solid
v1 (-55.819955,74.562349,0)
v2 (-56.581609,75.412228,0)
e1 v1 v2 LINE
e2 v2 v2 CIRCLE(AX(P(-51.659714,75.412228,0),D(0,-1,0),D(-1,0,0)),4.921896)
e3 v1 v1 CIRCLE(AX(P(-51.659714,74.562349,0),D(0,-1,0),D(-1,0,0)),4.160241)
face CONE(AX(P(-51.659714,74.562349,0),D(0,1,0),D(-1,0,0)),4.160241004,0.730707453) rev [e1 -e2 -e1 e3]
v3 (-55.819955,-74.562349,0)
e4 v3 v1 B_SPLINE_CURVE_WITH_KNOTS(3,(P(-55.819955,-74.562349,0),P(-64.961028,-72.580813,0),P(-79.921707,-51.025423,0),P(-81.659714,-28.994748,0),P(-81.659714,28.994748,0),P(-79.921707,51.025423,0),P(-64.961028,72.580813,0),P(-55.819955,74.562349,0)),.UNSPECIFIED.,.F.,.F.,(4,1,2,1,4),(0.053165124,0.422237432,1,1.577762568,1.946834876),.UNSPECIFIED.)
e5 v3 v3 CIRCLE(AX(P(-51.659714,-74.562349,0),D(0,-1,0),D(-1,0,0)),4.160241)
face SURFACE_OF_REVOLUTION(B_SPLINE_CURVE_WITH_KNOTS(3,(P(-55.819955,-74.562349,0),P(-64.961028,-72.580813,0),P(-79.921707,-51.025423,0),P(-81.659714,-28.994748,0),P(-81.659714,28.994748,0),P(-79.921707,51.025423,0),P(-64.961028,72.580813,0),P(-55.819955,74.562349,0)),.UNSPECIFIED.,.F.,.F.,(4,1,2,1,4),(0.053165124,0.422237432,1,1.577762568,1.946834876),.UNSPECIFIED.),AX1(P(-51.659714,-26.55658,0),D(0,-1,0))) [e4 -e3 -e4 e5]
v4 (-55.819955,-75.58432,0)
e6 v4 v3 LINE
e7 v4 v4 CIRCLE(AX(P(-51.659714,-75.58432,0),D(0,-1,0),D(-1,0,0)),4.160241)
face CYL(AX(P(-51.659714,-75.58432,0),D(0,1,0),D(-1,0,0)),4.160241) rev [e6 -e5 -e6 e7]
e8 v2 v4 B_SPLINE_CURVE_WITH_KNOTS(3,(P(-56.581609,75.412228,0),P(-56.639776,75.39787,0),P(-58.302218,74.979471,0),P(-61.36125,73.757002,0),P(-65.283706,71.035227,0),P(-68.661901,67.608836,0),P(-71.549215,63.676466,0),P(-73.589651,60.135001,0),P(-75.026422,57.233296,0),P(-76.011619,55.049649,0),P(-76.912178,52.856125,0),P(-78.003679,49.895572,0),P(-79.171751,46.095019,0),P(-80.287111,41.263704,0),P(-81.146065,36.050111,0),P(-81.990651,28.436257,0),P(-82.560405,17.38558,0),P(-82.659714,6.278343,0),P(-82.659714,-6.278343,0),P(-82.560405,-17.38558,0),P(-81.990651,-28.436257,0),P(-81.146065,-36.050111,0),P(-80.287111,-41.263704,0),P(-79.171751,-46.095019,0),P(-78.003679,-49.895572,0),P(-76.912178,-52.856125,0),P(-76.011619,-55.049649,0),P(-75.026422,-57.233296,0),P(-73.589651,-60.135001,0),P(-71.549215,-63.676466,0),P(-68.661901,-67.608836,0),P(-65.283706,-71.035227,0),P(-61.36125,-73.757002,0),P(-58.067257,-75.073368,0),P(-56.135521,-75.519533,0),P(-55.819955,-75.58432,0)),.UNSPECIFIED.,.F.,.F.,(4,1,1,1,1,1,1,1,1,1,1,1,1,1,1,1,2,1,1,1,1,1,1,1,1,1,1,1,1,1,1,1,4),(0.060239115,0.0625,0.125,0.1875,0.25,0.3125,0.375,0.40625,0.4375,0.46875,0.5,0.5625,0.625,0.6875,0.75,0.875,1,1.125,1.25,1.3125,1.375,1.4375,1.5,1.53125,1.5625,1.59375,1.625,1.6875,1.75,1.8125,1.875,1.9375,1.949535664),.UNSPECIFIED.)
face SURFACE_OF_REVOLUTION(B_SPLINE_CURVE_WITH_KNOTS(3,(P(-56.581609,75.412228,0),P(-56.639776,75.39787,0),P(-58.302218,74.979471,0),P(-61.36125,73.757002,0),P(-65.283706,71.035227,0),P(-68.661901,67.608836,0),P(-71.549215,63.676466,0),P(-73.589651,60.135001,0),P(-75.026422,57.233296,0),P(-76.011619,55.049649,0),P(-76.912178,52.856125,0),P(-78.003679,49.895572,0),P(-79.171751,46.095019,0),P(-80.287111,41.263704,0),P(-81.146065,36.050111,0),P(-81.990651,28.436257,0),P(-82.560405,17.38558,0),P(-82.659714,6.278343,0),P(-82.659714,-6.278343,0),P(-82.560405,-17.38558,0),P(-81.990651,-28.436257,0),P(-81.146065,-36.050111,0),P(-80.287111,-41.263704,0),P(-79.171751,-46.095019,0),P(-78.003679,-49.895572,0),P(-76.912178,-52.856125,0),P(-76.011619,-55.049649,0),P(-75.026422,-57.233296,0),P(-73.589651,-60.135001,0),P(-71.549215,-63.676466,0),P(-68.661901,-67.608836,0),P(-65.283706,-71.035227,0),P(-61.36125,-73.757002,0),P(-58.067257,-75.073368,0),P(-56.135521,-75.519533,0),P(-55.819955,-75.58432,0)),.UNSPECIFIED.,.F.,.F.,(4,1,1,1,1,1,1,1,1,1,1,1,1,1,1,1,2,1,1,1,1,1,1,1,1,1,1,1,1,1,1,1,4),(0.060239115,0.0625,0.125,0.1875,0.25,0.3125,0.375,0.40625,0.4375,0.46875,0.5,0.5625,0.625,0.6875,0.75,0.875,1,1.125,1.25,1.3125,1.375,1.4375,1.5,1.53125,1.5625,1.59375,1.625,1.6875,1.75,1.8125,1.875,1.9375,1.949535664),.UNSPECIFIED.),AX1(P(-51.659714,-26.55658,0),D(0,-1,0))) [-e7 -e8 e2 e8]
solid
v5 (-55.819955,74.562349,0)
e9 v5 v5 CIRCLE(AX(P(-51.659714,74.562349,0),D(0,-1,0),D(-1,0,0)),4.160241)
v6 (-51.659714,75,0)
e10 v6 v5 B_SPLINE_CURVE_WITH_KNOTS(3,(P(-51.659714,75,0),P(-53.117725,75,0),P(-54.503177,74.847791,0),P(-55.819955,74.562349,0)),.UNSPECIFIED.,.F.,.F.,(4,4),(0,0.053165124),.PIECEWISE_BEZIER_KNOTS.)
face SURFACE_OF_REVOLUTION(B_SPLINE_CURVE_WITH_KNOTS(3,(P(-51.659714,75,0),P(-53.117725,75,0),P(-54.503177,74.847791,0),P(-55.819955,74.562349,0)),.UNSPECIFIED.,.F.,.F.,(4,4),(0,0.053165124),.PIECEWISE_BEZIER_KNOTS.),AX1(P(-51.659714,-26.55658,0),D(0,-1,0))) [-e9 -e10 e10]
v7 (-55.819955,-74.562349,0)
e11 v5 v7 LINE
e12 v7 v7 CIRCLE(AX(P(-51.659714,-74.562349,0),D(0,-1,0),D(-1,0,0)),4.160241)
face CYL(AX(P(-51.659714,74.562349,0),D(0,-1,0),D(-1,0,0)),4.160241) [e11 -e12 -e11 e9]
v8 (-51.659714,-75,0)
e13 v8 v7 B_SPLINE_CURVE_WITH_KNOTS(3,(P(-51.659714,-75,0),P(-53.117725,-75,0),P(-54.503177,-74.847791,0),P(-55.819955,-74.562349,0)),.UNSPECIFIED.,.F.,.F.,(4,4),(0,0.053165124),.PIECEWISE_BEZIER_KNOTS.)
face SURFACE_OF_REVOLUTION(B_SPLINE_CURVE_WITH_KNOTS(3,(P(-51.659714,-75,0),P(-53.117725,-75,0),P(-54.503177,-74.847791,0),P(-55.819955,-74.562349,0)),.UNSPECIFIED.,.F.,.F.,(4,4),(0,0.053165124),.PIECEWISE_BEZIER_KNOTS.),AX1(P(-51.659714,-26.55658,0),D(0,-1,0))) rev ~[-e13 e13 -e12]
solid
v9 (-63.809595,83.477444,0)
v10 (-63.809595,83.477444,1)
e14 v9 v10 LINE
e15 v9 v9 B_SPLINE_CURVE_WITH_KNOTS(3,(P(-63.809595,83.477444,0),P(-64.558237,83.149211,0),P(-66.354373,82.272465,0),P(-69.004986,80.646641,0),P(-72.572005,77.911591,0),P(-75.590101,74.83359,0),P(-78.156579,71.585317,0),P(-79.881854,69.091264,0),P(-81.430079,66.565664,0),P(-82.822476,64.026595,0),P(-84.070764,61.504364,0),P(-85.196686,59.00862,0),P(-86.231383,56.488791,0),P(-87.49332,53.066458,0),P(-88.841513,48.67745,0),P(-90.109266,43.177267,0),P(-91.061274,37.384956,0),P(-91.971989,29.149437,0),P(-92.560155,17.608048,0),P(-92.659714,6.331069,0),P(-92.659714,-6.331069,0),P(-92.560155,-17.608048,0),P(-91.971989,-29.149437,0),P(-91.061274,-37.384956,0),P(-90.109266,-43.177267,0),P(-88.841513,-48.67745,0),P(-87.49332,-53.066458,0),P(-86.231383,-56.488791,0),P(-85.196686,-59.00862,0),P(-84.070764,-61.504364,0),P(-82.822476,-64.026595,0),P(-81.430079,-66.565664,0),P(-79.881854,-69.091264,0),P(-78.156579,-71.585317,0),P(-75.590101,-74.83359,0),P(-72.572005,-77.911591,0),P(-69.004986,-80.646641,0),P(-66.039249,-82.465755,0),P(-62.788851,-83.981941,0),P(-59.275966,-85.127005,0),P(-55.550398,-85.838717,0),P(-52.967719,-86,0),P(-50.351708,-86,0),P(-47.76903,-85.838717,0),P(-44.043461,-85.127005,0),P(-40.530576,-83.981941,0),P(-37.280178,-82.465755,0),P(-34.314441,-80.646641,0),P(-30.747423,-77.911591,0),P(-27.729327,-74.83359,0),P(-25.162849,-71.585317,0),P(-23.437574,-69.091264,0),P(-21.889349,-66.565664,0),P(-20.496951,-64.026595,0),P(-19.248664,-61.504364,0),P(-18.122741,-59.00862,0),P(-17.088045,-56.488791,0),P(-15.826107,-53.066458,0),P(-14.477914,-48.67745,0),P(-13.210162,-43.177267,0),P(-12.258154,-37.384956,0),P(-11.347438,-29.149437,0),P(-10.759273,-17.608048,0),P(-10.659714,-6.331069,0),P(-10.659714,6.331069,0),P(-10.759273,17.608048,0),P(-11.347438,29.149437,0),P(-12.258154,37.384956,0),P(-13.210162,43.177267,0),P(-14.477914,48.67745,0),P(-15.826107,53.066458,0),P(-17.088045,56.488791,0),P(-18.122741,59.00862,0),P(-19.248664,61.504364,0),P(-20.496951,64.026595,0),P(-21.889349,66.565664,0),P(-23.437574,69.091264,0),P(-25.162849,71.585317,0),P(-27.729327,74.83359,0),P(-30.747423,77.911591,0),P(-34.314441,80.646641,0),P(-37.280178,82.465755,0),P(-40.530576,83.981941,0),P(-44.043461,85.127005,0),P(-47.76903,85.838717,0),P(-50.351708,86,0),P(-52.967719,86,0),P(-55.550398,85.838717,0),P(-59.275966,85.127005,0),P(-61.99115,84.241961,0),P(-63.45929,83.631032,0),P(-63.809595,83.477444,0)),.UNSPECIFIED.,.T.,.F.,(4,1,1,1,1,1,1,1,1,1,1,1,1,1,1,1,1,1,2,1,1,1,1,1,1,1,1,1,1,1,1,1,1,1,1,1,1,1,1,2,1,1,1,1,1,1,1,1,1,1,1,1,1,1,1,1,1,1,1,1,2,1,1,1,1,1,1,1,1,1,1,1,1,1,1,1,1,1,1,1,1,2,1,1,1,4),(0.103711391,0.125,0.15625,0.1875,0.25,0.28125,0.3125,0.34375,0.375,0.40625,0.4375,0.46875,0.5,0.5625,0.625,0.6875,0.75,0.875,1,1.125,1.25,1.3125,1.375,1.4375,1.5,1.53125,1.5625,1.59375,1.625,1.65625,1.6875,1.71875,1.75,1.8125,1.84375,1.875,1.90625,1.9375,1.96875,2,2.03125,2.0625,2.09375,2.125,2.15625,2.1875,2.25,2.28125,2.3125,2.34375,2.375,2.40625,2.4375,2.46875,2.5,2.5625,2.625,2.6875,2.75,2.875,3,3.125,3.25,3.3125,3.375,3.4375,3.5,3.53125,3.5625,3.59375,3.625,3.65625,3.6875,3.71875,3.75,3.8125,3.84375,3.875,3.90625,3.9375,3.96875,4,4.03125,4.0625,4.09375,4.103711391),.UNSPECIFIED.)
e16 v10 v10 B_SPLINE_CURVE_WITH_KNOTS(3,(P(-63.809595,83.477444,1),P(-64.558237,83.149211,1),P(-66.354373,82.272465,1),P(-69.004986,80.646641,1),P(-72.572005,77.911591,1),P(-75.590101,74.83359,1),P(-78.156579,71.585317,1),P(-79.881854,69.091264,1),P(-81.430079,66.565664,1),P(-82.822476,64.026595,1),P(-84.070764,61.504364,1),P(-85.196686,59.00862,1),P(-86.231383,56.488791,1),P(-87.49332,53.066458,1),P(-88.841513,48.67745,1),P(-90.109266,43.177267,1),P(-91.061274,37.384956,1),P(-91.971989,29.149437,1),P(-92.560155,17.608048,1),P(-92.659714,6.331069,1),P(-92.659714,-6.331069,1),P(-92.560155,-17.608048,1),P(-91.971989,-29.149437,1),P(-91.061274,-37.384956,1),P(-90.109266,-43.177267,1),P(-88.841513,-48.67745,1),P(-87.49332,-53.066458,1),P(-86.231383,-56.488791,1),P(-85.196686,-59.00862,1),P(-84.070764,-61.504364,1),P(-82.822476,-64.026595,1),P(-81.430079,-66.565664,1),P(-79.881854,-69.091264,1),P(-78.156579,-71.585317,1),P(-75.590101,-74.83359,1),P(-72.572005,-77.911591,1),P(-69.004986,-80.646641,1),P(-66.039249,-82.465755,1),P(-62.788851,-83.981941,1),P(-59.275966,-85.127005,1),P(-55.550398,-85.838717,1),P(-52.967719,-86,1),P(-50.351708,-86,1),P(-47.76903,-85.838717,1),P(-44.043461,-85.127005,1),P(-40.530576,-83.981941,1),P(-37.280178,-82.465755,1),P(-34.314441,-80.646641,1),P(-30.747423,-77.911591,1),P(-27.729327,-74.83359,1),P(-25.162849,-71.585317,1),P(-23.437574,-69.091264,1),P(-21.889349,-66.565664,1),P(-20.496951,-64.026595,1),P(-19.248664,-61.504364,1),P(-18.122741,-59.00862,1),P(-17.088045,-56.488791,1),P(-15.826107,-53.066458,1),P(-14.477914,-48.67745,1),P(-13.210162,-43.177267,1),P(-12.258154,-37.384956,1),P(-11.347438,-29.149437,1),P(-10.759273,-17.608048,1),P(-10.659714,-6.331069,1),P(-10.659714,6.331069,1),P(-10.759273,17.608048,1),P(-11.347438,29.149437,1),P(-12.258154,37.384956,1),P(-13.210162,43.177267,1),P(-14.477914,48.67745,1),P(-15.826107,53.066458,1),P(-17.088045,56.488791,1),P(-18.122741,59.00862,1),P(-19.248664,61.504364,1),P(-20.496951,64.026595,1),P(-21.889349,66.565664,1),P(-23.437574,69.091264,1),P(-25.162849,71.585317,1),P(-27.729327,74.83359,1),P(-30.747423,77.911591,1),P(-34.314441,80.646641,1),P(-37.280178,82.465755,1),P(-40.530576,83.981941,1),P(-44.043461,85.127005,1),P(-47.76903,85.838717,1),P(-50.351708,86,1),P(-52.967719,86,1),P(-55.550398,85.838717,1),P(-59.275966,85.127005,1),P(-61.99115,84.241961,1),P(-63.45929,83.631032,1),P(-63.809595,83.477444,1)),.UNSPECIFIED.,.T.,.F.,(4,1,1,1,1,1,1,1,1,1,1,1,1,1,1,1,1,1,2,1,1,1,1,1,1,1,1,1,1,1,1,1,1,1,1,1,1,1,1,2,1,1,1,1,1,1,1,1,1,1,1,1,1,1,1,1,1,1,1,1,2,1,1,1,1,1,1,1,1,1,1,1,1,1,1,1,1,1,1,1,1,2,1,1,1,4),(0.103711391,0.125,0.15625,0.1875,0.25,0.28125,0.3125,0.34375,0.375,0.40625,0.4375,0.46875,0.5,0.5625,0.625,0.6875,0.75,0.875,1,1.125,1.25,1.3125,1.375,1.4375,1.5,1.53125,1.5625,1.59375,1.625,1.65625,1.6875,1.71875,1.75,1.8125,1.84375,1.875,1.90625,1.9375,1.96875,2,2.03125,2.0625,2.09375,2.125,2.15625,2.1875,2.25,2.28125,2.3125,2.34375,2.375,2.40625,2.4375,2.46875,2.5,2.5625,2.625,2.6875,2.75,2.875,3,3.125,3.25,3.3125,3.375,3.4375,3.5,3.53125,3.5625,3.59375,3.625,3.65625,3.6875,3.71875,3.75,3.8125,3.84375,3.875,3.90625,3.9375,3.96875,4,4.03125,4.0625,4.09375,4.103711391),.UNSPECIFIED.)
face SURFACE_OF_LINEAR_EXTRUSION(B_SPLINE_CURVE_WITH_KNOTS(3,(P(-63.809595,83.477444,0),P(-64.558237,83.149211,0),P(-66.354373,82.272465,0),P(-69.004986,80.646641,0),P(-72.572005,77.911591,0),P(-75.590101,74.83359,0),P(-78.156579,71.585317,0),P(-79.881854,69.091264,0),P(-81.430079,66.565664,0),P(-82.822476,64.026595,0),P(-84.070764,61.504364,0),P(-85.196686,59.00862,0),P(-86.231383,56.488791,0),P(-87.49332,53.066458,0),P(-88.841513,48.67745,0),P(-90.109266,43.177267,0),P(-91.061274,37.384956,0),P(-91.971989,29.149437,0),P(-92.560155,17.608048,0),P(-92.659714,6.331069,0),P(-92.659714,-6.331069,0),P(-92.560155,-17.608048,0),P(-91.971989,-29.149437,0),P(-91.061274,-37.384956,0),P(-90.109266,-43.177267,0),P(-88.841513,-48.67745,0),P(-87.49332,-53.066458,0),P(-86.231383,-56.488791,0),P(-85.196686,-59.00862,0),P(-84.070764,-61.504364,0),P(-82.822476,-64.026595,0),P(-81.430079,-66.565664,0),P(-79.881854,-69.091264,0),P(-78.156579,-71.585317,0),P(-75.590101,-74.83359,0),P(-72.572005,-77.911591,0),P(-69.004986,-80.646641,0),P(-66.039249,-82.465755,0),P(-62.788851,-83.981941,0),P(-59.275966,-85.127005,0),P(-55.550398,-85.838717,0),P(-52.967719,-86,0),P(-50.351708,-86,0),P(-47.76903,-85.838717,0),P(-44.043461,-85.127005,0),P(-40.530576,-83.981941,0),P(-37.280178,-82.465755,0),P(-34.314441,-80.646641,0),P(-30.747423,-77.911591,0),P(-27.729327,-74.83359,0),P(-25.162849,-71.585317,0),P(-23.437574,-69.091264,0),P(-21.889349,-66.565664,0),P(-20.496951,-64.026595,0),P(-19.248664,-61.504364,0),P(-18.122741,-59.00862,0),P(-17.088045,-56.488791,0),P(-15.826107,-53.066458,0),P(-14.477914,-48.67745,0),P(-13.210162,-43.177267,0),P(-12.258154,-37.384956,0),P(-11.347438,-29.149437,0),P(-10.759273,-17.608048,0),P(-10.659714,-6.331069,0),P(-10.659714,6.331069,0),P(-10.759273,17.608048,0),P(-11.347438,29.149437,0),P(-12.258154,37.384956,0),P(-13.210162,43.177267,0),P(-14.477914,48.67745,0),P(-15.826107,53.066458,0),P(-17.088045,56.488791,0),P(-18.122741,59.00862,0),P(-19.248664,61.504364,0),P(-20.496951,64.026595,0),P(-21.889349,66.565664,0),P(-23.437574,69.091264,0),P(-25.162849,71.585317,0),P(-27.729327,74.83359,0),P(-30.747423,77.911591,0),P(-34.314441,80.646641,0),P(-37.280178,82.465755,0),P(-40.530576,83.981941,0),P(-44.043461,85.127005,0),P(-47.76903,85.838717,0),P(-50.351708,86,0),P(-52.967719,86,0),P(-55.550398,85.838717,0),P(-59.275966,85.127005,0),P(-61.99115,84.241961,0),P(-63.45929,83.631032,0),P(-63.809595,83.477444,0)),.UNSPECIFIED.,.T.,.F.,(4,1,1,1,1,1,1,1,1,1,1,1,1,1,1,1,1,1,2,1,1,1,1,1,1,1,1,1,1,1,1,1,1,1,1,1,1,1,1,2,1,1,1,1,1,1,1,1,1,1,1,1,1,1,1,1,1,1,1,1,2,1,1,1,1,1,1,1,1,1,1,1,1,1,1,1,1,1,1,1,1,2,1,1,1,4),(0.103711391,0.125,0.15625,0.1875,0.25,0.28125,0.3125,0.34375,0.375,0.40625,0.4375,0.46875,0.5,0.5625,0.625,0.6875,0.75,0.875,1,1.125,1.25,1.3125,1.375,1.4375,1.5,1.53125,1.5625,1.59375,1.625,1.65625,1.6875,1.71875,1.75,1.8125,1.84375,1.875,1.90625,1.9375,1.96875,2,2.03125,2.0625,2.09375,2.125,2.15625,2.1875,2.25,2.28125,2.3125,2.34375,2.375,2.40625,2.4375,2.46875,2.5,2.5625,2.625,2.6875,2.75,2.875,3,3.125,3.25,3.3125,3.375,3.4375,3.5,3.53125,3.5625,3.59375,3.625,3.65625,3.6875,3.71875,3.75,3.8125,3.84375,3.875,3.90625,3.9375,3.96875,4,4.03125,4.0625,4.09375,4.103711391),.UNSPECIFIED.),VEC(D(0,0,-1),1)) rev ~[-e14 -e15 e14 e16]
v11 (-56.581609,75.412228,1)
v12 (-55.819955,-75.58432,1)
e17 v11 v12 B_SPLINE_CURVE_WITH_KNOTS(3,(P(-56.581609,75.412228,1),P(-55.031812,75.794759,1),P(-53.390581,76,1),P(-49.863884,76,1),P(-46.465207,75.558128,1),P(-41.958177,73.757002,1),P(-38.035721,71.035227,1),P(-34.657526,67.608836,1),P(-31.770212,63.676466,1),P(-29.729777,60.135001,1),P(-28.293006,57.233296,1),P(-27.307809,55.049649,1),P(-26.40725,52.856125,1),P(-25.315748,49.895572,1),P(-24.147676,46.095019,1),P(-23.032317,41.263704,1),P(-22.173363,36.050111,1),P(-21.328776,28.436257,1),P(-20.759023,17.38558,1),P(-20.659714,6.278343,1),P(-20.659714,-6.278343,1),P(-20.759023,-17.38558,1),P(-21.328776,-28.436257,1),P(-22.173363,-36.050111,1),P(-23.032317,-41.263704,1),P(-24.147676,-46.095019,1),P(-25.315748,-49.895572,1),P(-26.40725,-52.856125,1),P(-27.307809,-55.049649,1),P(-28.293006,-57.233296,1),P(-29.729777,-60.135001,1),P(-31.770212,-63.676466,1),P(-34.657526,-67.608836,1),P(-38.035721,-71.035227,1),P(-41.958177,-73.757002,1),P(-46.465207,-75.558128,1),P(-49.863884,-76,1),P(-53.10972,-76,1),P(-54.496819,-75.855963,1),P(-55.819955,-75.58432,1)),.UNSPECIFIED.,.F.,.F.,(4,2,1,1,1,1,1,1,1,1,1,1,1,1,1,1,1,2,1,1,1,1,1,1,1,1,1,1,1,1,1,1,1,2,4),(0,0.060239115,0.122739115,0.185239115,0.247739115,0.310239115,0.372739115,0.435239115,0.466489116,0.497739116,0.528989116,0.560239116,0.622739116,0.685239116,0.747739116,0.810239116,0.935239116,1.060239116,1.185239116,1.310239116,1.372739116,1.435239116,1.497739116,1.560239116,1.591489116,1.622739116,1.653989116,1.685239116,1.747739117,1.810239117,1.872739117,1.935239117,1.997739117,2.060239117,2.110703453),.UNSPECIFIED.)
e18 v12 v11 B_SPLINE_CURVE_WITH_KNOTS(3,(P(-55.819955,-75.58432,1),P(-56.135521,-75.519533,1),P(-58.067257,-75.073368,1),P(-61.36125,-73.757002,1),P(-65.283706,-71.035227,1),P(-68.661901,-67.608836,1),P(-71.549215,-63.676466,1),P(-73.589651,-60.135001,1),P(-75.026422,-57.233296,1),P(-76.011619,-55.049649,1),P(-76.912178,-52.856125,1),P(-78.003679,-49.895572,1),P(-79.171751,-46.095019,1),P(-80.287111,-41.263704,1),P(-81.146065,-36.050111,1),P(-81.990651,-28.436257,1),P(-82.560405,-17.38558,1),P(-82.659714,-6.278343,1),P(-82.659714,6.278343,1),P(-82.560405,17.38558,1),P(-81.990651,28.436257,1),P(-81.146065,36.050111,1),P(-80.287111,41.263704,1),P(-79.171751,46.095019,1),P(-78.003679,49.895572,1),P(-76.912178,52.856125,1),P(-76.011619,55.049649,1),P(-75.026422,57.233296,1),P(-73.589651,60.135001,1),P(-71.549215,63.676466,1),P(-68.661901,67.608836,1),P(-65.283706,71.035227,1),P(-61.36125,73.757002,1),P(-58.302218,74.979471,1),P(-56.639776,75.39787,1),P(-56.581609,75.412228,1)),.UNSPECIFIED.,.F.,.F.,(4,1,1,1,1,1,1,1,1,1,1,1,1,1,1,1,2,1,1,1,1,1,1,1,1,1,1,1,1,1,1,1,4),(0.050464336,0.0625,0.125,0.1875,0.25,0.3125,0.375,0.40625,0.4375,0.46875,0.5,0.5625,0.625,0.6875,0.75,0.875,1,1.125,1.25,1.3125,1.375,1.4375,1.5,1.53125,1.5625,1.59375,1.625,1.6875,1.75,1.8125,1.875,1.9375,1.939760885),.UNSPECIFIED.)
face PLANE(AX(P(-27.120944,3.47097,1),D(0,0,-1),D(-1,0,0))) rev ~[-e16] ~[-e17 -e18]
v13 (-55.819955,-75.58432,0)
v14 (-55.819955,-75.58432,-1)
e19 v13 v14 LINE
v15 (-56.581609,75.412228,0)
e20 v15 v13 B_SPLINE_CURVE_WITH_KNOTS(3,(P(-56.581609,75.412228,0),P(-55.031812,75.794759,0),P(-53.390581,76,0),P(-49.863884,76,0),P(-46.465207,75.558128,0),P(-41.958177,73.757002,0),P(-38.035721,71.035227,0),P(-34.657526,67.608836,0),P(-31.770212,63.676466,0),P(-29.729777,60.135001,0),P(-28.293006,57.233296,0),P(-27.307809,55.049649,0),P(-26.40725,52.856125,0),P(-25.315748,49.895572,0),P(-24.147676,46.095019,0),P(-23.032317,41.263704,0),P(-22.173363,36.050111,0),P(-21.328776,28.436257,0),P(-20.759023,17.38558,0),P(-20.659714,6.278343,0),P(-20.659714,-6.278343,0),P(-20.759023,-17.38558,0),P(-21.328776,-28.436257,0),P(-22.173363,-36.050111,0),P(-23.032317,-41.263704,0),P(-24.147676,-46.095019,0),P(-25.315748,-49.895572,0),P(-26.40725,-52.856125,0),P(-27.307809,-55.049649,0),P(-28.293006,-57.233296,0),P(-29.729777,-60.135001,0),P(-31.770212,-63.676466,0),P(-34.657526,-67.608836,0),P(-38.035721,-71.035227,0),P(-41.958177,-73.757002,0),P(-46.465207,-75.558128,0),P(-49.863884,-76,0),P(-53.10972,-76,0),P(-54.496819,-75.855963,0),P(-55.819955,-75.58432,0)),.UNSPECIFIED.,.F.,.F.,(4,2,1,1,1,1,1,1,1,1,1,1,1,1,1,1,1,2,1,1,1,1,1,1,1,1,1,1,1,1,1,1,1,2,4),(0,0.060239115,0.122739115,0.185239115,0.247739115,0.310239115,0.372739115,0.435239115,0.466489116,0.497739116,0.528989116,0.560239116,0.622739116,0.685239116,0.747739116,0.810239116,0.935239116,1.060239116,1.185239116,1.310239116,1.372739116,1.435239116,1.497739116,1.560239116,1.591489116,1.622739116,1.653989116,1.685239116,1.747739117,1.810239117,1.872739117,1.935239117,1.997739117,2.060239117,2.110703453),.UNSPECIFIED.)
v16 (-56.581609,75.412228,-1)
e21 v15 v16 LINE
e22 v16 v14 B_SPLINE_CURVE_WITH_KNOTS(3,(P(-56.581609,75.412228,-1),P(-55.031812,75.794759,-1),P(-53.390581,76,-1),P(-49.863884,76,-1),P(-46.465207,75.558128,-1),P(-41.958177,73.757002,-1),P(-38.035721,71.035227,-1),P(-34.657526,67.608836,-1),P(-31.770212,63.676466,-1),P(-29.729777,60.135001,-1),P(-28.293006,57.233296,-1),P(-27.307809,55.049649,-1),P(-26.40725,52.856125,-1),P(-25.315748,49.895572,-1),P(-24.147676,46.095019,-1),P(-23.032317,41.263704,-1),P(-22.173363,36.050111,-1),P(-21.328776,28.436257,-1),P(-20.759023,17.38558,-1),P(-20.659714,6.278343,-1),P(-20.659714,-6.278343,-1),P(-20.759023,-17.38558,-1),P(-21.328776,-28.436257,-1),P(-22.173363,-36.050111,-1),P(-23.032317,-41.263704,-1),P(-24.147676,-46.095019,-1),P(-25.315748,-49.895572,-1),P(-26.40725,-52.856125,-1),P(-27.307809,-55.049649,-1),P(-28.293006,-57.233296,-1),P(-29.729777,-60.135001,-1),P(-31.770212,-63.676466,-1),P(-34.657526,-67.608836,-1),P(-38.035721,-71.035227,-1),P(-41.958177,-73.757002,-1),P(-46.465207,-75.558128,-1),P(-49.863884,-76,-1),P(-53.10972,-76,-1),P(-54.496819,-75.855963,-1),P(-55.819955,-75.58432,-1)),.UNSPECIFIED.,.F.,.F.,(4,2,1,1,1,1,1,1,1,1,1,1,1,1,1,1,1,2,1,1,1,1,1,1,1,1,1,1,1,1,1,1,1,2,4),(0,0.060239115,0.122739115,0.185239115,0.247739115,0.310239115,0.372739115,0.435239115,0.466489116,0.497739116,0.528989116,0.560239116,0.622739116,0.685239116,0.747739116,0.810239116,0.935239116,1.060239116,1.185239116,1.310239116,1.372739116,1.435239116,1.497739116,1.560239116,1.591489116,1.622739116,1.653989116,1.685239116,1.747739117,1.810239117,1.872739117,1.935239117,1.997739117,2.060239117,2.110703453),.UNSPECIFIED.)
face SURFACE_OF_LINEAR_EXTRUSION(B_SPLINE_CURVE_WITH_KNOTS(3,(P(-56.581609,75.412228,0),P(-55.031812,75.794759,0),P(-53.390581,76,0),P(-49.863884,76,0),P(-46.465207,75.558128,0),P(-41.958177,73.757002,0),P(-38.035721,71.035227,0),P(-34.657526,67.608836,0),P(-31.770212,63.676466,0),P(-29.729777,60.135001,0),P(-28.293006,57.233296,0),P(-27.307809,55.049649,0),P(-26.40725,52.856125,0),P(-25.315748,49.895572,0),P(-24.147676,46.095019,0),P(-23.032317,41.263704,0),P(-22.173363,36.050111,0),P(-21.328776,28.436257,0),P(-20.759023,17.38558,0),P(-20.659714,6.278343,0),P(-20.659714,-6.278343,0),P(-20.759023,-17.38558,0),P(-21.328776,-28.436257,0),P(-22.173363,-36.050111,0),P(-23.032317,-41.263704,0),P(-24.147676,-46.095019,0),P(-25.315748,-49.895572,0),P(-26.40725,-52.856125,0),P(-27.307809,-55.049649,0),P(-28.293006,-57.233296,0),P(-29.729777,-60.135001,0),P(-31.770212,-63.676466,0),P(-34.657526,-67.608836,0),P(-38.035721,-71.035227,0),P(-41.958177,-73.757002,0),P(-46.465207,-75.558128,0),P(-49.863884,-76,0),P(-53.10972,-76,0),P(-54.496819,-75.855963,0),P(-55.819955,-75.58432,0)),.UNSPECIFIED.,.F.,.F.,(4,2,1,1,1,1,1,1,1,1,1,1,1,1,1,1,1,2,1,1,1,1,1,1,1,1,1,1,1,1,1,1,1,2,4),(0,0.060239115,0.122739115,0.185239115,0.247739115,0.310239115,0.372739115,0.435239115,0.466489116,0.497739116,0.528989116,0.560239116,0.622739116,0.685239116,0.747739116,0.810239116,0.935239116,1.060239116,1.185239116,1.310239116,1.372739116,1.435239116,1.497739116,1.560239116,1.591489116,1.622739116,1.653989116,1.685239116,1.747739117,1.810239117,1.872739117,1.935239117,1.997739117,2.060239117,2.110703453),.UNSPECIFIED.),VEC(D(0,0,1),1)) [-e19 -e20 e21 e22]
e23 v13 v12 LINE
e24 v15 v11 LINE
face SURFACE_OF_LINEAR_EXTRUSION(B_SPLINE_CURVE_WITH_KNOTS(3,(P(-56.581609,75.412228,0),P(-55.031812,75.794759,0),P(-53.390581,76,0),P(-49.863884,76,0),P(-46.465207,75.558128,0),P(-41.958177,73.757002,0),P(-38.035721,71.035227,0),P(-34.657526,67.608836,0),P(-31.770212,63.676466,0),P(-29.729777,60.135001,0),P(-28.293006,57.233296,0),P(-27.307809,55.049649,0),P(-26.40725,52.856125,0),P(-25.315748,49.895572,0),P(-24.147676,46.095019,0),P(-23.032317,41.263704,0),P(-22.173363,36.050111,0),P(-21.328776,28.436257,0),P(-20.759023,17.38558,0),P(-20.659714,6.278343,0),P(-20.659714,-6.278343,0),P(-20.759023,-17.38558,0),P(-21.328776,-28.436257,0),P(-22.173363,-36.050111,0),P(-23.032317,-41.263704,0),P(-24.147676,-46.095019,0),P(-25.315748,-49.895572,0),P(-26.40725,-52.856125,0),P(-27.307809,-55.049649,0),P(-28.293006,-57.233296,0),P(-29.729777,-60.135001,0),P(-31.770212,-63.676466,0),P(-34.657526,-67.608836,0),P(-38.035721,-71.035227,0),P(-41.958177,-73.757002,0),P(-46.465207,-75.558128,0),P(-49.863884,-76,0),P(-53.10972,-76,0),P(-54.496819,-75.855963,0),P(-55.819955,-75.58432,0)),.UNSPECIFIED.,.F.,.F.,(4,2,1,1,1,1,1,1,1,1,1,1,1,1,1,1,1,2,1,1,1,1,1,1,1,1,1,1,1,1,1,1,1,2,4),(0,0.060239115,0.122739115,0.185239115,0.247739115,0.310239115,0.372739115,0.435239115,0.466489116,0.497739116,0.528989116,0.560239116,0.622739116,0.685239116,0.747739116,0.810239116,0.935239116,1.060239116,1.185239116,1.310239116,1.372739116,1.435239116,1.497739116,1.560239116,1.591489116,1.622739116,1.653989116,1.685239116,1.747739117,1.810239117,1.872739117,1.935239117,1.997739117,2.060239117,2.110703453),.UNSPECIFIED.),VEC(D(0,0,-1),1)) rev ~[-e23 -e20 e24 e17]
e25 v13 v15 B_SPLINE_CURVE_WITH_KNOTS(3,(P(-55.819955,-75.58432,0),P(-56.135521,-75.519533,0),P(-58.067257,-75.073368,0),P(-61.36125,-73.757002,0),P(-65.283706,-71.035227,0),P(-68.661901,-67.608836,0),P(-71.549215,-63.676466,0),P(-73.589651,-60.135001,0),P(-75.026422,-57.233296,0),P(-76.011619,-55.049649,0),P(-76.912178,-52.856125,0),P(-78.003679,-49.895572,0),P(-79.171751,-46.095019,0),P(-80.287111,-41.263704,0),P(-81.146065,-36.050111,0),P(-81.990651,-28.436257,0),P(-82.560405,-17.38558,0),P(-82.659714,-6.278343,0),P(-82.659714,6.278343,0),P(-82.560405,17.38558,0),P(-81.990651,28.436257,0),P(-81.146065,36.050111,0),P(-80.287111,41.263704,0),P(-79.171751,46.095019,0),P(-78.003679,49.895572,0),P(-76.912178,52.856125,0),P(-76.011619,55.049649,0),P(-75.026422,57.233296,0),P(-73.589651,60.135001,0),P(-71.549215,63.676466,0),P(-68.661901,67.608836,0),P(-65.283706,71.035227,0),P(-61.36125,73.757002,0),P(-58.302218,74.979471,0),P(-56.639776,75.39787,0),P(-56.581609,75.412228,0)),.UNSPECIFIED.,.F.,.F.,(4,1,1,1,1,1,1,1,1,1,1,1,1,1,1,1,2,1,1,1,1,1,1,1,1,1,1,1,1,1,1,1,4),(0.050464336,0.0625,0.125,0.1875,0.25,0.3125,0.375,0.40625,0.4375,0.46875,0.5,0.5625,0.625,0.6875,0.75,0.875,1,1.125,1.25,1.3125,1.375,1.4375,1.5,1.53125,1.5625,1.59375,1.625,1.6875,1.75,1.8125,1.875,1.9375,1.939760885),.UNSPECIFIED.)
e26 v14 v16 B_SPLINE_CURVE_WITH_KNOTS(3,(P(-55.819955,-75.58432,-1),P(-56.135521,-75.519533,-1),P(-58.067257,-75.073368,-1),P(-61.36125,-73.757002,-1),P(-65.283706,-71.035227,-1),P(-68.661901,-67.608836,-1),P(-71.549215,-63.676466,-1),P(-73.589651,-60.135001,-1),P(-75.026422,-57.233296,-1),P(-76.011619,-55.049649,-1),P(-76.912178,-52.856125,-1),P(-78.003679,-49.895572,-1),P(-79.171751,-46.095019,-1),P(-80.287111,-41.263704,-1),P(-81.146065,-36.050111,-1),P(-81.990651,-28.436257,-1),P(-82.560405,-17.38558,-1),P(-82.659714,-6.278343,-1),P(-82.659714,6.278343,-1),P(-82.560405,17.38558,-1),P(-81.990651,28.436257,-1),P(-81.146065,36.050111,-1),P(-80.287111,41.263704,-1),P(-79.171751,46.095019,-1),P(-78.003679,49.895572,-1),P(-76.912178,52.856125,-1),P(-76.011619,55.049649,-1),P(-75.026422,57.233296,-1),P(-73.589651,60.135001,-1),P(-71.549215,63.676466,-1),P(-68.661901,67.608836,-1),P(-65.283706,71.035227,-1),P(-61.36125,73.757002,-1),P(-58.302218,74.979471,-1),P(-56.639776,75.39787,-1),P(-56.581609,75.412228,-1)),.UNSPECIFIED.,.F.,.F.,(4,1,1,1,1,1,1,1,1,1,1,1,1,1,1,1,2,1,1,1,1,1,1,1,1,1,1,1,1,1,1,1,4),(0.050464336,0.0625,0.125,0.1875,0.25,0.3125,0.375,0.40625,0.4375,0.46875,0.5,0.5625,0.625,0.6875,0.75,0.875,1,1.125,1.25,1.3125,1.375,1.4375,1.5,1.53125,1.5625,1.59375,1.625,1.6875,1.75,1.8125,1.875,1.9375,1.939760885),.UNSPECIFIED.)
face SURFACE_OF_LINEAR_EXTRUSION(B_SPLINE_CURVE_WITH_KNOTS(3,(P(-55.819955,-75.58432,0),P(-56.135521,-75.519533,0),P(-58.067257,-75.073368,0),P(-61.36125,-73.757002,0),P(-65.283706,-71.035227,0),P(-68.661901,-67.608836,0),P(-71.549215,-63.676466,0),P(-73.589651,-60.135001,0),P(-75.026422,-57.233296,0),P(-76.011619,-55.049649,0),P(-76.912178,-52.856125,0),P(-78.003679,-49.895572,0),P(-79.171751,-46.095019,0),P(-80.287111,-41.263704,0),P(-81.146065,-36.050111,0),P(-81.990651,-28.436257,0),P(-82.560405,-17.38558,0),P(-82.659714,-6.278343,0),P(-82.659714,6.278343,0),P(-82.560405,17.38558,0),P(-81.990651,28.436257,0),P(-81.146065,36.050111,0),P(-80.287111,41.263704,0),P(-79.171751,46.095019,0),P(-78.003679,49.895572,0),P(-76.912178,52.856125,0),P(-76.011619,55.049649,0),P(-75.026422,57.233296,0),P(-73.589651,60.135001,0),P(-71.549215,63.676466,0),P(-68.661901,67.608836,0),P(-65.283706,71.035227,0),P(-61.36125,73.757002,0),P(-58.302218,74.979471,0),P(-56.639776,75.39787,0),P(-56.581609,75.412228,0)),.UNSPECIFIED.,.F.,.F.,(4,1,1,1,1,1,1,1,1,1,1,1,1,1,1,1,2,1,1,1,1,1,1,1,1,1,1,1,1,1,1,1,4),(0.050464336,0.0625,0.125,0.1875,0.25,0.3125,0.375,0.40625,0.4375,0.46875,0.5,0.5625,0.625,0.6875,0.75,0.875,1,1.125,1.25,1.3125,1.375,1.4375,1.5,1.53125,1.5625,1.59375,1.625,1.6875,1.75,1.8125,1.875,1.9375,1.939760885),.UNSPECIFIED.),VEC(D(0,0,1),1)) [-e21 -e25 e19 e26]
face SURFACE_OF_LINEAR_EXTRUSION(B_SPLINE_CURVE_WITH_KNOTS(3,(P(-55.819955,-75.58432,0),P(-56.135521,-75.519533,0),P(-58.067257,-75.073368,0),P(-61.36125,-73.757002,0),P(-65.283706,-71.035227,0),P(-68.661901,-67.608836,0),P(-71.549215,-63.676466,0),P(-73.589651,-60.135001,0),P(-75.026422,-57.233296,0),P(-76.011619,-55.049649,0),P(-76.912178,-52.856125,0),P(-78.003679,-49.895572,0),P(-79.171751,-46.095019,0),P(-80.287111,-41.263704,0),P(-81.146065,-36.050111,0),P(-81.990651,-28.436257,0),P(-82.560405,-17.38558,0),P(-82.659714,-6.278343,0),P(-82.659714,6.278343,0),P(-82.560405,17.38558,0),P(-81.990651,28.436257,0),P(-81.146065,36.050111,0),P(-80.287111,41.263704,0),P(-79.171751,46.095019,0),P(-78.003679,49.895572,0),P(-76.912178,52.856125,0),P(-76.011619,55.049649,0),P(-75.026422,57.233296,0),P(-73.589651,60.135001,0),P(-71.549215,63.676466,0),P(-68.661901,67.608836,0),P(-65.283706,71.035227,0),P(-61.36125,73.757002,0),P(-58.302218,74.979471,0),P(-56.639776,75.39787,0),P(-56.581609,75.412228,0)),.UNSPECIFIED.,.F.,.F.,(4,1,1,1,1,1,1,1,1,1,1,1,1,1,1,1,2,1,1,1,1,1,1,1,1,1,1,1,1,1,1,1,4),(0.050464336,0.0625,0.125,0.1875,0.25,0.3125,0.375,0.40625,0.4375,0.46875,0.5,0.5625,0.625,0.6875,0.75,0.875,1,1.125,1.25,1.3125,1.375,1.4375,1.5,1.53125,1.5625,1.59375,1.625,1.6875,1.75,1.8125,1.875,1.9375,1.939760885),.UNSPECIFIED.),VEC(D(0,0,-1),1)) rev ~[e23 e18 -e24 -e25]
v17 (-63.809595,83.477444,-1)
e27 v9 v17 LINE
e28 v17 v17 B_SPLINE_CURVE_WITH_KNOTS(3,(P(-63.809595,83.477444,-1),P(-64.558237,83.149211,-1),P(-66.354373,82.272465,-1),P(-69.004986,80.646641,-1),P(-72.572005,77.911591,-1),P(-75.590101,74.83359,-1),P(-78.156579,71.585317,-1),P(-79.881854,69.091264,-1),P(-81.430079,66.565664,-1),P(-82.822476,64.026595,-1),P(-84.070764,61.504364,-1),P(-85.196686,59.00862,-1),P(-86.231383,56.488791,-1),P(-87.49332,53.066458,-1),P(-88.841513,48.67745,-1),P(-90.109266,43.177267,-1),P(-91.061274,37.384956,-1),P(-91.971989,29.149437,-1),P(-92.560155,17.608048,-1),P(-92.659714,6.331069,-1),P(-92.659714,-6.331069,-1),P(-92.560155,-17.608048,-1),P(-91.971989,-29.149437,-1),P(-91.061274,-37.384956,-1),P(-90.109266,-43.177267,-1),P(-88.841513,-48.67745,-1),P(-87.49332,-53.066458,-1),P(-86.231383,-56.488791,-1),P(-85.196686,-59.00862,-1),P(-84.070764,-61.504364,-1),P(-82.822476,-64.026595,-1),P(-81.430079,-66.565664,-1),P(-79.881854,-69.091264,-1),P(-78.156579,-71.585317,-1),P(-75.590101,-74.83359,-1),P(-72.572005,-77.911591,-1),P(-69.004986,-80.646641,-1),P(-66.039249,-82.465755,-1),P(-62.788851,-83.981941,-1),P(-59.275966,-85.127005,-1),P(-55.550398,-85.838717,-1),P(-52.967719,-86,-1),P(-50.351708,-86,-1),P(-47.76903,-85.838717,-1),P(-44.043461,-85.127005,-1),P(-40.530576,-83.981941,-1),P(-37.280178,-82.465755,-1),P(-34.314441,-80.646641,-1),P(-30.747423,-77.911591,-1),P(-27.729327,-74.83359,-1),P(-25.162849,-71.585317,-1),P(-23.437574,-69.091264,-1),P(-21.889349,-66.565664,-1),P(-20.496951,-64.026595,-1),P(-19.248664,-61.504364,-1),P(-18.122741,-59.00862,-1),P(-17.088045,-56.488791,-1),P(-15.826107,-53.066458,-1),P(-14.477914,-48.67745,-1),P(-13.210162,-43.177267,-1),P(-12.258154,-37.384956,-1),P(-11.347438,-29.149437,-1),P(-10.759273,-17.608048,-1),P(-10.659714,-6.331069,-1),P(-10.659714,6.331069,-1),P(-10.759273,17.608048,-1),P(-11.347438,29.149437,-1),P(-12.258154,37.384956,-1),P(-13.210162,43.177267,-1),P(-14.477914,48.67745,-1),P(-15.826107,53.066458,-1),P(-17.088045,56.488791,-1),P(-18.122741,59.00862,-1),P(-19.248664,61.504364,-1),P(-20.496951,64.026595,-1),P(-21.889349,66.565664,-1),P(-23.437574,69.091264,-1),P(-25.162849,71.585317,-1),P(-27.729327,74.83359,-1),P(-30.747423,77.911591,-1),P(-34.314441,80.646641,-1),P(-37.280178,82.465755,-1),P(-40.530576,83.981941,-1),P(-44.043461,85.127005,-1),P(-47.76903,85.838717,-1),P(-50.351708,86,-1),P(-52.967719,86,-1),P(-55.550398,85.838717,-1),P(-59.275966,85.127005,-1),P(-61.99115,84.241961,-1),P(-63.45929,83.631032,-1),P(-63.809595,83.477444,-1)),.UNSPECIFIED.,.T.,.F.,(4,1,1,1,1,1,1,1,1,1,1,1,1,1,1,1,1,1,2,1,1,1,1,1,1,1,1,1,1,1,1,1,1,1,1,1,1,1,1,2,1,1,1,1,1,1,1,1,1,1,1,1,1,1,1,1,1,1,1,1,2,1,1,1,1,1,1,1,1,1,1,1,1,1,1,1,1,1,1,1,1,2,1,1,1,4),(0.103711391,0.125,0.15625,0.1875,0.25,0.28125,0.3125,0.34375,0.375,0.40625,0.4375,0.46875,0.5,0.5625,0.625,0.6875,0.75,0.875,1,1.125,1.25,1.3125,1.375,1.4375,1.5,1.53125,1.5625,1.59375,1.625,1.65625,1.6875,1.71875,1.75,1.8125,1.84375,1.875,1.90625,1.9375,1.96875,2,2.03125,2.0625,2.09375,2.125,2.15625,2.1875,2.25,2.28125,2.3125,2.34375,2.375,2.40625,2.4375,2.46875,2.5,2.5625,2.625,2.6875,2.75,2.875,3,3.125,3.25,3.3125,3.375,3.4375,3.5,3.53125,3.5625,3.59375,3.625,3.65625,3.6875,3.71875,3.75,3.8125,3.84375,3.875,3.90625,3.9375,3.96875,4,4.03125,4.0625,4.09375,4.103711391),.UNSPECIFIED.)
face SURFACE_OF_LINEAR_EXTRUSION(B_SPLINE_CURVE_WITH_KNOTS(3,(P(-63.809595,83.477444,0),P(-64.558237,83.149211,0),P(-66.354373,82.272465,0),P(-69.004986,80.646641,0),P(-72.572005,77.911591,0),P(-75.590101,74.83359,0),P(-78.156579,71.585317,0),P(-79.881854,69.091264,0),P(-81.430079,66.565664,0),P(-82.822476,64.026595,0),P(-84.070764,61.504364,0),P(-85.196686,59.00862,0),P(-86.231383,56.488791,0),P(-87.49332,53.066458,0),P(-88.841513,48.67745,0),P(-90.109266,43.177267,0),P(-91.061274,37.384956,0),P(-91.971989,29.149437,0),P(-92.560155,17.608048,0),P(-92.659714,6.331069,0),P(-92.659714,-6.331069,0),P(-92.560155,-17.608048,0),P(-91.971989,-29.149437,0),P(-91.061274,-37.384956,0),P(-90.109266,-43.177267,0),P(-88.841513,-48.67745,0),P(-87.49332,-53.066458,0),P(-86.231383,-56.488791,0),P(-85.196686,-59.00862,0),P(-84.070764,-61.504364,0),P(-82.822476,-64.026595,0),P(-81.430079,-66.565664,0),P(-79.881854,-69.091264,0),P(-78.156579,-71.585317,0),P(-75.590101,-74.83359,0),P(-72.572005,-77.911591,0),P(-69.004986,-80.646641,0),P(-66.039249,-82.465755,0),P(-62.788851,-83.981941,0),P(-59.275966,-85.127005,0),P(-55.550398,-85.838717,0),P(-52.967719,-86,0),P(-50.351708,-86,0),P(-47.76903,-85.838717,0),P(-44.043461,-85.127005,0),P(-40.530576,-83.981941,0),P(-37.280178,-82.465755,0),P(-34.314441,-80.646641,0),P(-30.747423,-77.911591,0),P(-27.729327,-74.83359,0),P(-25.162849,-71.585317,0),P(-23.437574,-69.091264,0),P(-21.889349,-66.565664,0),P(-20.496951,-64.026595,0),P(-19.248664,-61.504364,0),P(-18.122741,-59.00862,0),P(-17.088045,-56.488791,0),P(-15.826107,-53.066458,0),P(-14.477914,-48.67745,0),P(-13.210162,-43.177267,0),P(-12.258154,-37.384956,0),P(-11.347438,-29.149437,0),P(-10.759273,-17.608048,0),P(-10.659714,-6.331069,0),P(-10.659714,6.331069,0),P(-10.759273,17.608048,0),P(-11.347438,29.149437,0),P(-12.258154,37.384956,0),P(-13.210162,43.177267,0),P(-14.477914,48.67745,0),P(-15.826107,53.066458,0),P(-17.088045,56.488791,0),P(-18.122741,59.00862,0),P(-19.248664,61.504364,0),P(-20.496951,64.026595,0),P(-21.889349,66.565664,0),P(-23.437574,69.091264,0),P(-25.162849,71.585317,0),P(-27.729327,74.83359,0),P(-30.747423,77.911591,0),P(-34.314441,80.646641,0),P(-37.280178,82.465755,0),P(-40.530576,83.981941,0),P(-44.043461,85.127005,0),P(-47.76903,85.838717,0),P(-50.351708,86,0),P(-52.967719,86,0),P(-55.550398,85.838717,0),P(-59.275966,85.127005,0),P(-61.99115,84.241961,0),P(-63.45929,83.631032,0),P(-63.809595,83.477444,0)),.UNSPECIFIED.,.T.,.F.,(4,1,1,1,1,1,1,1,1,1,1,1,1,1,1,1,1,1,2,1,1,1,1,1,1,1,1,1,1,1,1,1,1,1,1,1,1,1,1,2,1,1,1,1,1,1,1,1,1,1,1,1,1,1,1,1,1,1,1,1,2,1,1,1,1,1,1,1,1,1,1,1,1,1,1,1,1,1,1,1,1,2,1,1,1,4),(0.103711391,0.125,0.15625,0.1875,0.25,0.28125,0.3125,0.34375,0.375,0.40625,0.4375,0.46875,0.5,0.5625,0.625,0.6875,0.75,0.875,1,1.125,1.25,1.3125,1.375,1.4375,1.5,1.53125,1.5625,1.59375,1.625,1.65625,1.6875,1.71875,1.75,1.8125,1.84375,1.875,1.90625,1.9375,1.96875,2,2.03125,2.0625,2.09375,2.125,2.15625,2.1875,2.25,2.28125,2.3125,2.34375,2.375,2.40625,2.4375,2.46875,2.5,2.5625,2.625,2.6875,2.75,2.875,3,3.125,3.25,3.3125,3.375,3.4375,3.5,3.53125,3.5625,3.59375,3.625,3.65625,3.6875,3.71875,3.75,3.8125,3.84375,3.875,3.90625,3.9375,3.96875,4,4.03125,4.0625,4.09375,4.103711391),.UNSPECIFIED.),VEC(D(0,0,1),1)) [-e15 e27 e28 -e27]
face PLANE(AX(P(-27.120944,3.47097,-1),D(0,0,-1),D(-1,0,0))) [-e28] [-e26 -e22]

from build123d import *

# Parameters (mm, degrees)
F2_DEPTH = 1


# Not quite as in the source:
# - the dataset's text gives a spline's control points without its knots; the knots are read off the source's solid


with BuildPart() as f1:
    # F0 (on Top) → F1 (revolve)
    with BuildSketch(Plane.XY):
        with BuildLine():
            Line((-55.8199547231, 74.5623492029), (-56.5816092533, 75.4122275922))
            add(Edge.make_bspline(
                [(-56.5816092533, 75.4122275922), (-56.6397760093, 75.3978704726), (-58.3022178812, 74.9794709714), (-61.3612502345, 73.7570023616), (-65.2837059846, 71.035227187), (-68.6619012674, 67.6088358251), (-71.5492149944, 63.676466045), (-73.5896506783, 60.135000823), (-75.0264216479, 57.2332962118), (-76.0116188685, 55.0496489597), (-76.912177867, 52.8561250408), (-78.003679448, 49.8955719617), (-79.1717511063, 46.0950193349), (-80.2871106611, 41.2637042949), (-81.1460647488, 36.0501110723), (-81.9906513276, 28.4362571667), (-82.5604048188, 17.3855802508), (-82.6597137195, 6.2783429019), (-82.6597137195, 0)],
                knots=[0.0602391152, 0.0602391152, 0.0602391152, 0.0602391152, 0.0625, 0.125, 0.1875, 0.25, 0.3125, 0.375, 0.40625, 0.4375, 0.46875, 0.5, 0.5625, 0.625, 0.6875, 0.75, 0.875, 1, 1, 1, 1], degree=3))
            add(Edge.make_bspline(
                [(-55.8199547231, -75.5843198027), (-56.1355205763, -75.5195334393), (-58.0672567218, -75.0733675402), (-61.3612502345, -73.7570023616), (-65.2837059846, -71.035227187), (-68.6619012674, -67.6088358251), (-71.5492149944, -63.676466045), (-73.5896506783, -60.135000823), (-75.0264216479, -57.2332962118), (-76.0116188685, -55.0496489597), (-76.912177867, -52.8561250408), (-78.003679448, -49.8955719617), (-79.1717511063, -46.0950193349), (-80.2871106611, -41.2637042949), (-81.1460647488, -36.0501110723), (-81.9906513276, -28.4362571667), (-82.5604048188, -17.3855802508), (-82.6597137195, -6.2783429019), (-82.6597137195, 0)],
                knots=[0.0504643362, 0.0504643362, 0.0504643362, 0.0504643362, 0.0625, 0.125, 0.1875, 0.25, 0.3125, 0.375, 0.40625, 0.4375, 0.46875, 0.5, 0.5625, 0.625, 0.6875, 0.75, 0.875, 1, 1, 1, 1], degree=3))
            Line((-55.8199547231, -75.5843198027), (-55.8199547231, -74.5623492029))
            add(Edge.make_bspline(
                [(-55.8199547231, -74.5623492029), (-64.9610278539, -72.5808125911), (-79.9217070161, -51.0254234957), (-81.6597137195, -28.9947475074), (-81.6597137195, 0)],
                knots=[0.0531651237, 0.0531651237, 0.0531651237, 0.0531651237, 0.4222374323, 1, 1, 1, 1], degree=3))
            add(Edge.make_bspline(
                [(-55.8199547231, 74.5623492029), (-64.9610278539, 72.5808125911), (-79.9217070161, 51.0254234957), (-81.6597137195, 28.9947475074), (-81.6597137195, 0)],
                knots=[0.0531651237, 0.0531651237, 0.0531651237, 0.0531651237, 0.4222374323, 1, 1, 1, 1], degree=3))
        make_face()
    revolve(axis=Axis((-51.6597137195, -26.5565803749, 0), (0, -1, 0)))


with BuildPart() as f1b:
    # F0 (on Top) → F1, piece 2 (revolve)
    with BuildSketch(Plane.XY):
        with BuildLine():
            Line((-51.6597137195, -75), (-51.6597137195, 75))
            add(Edge.make_bspline(
                [(-51.6597137195, 75), (-53.117725446, 75), (-54.5031767561, 74.8477909354), (-55.8199547231, 74.5623492029)],
                knots=[0, 0, 0, 0, 0.0531651237, 0.0531651237, 0.0531651237, 0.0531651237], degree=3))
            Line((-55.8199547231, 74.5623492029), (-55.8199547231, -74.5623492029))
            add(Edge.make_bspline(
                [(-51.6597137195, -75), (-53.117725446, -75), (-54.5031767561, -74.8477909354), (-55.8199547231, -74.5623492029)],
                knots=[0, 0, 0, 0, 0.0531651237, 0.0531651237, 0.0531651237, 0.0531651237], degree=3))
        make_face()
    revolve(axis=Axis((-51.6597137195, -26.5565803749, 0), (0, -1, 0)))


with BuildPart() as f2:
    # F0 (on Top) → F2 (new body, symmetric)
    with BuildSketch(Plane.XY):
        with BuildLine():
            add(Edge.make_bspline(
                [(-51.6597137195, 76), (-53.3905810534, 76), (-55.0318116526, 75.794759317), (-56.5816092533, 75.4122275922)],
                knots=[0, 0, 0, 0, 0.0602391152, 0.0602391152, 0.0602391152, 0.0602391152], degree=3))
            add(Edge.make_bspline(
                [(-51.6597137195, 76), (-49.8638837493, 76), (-46.4652067363, 75.5581281718), (-41.9581772046, 73.7570023616), (-38.0357214545, 71.035227187), (-34.6575261717, 67.6088358251), (-31.7702124447, 63.676466045), (-29.7297767607, 60.135000823), (-28.2930057912, 57.2332962118), (-27.3078085706, 55.0496489597), (-26.407249572, 52.8561250408), (-25.3157479911, 49.8955719617), (-24.1476763328, 46.0950193349), (-23.0323167779, 41.2637042949), (-22.1733626903, 36.0501110723), (-21.3287761115, 28.4362571667), (-20.7590226202, 17.3855802508), (-20.6597137195, 6.2783429019), (-20.6597137195, 0)],
                knots=[0, 0, 0, 0, 0.0625, 0.125, 0.1875, 0.25, 0.3125, 0.375, 0.40625, 0.4375, 0.46875, 0.5, 0.5625, 0.625, 0.6875, 0.75, 0.875, 1, 1, 1, 1], degree=3))
            add(Edge.make_bspline(
                [(-51.6597137195, -76), (-49.8638837493, -76), (-46.4652067363, -75.5581281718), (-41.9581772046, -73.7570023616), (-38.0357214545, -71.035227187), (-34.6575261717, -67.6088358251), (-31.7702124447, -63.676466045), (-29.7297767607, -60.135000823), (-28.2930057912, -57.2332962118), (-27.3078085706, -55.0496489597), (-26.407249572, -52.8561250408), (-25.3157479911, -49.8955719617), (-24.1476763328, -46.0950193349), (-23.0323167779, -41.2637042949), (-22.1733626903, -36.0501110723), (-21.3287761115, -28.4362571667), (-20.7590226202, -17.3855802508), (-20.6597137195, -6.2783429019), (-20.6597137195, 0)],
                knots=[0, 0, 0, 0, 0.0625, 0.125, 0.1875, 0.25, 0.3125, 0.375, 0.40625, 0.4375, 0.46875, 0.5, 0.5625, 0.625, 0.6875, 0.75, 0.875, 1, 1, 1, 1], degree=3))
            Line((-51.6597137195, -76), (-51.6597137195, -86))
            add(Edge.make_bspline(
                [(-51.6597137195, -86), (-50.3517081027, -86), (-47.7690296636, -85.8387170423), (-44.0434614492, -85.1270052189), (-40.5305762875, -83.9819411512), (-37.2801784464, -82.4657547396), (-34.314441056, -80.6466412752), (-30.747422832, -77.9115906547), (-27.7293267494, -74.8335900569), (-25.1628486092, -71.5853173338), (-23.4375735308, -69.0912636735), (-21.889348579, -66.5656635825), (-20.4969514445, -64.0265948028), (-19.2486638728, -61.504363593), (-18.1227411236, -59.0086196482), (-17.0880446352, -56.4887914009), (-15.8261069566, -53.0664581165), (-14.4779141554, -48.6774501047), (-13.2101618031, -43.1772674245), (-12.2581535204, -37.384955502), (-11.3474379426, -29.1494372612), (-10.7592725159, -17.6080481383), (-10.6597137195, -6.3310685453), (-10.6597137195, 0)],
                knots=[0, 0, 0, 0, 0.03125, 0.0625, 0.09375, 0.125, 0.15625, 0.1875, 0.25, 0.28125, 0.3125, 0.34375, 0.375, 0.40625, 0.4375, 0.46875, 0.5, 0.5625, 0.625, 0.6875, 0.75, 0.875, 1, 1, 1, 1], degree=3))
            add(Edge.make_bspline(
                [(-51.6597137195, 86), (-50.3517081027, 86), (-47.7690296636, 85.8387170423), (-44.0434614492, 85.1270052189), (-40.5305762875, 83.9819411512), (-37.2801784464, 82.4657547396), (-34.314441056, 80.6466412752), (-30.747422832, 77.9115906547), (-27.7293267494, 74.8335900569), (-25.1628486092, 71.5853173338), (-23.4375735308, 69.0912636735), (-21.889348579, 66.5656635825), (-20.4969514445, 64.0265948028), (-19.2486638728, 61.504363593), (-18.1227411236, 59.0086196482), (-17.0880446352, 56.4887914009), (-15.8261069566, 53.0664581165), (-14.4779141554, 48.6774501047), (-13.2101618031, 43.1772674245), (-12.2581535204, 37.384955502), (-11.3474379426, 29.1494372612), (-10.7592725159, 17.6080481383), (-10.6597137195, 6.3310685453), (-10.6597137195, 0)],
                knots=[0, 0, 0, 0, 0.03125, 0.0625, 0.09375, 0.125, 0.15625, 0.1875, 0.25, 0.28125, 0.3125, 0.34375, 0.375, 0.40625, 0.4375, 0.46875, 0.5, 0.5625, 0.625, 0.6875, 0.75, 0.875, 1, 1, 1, 1], degree=3))
            add(Edge.make_bspline(
                [(-51.6597137195, 86), (-52.9677193364, 86), (-55.5503977755, 85.8387170423), (-59.2759659899, 85.1270052189), (-61.9911504677, 84.2419605791), (-63.4592895327, 83.6310316869), (-63.8095950817, 83.4774444461)],
                knots=[0, 0, 0, 0, 0.03125, 0.0625, 0.09375, 0.1037113909, 0.1037113909, 0.1037113909, 0.1037113909], degree=3))
            Line((-63.8095950817, 83.4774444461), (-56.5816092533, 75.4122275922))
        make_face()
        with BuildLine():
            add(Edge.make_bspline(
                [(-56.5816092533, 75.4122275922), (-56.6397760093, 75.3978704726), (-58.3022178812, 74.9794709714), (-61.3612502345, 73.7570023616), (-65.2837059846, 71.035227187), (-68.6619012674, 67.6088358251), (-71.5492149944, 63.676466045), (-73.5896506783, 60.135000823), (-75.0264216479, 57.2332962118), (-76.0116188685, 55.0496489597), (-76.912177867, 52.8561250408), (-78.003679448, 49.8955719617), (-79.1717511063, 46.0950193349), (-80.2871106611, 41.2637042949), (-81.1460647488, 36.0501110723), (-81.9906513276, 28.4362571667), (-82.5604048188, 17.3855802508), (-82.6597137195, 6.2783429019), (-82.6597137195, 0)],
                knots=[0.0602391152, 0.0602391152, 0.0602391152, 0.0602391152, 0.0625, 0.125, 0.1875, 0.25, 0.3125, 0.375, 0.40625, 0.4375, 0.46875, 0.5, 0.5625, 0.625, 0.6875, 0.75, 0.875, 1, 1, 1, 1], degree=3))
            Line((-56.5816092533, 75.4122275922), (-63.8095950817, 83.4774444461))
            add(Edge.make_bspline(
                [(-63.8095950817, 83.4774444461), (-64.5582373144, 83.149211293), (-66.3543729327, 82.2724651368), (-69.0049863831, 80.6466412752), (-72.572004607, 77.9115906547), (-75.5901006897, 74.8335900569), (-78.1565788298, 71.5853173338), (-79.8818539083, 69.0912636735), (-81.4300788601, 66.5656635825), (-82.8224759946, 64.0265948028), (-84.0707635663, 61.504363593), (-85.1966863154, 59.0086196482), (-86.2313828039, 56.4887914009), (-87.4933204824, 53.0664581165), (-88.8415132837, 48.6774501047), (-90.109265636, 43.1772674245), (-91.0612739187, 37.384955502), (-91.9719894964, 29.1494372612), (-92.5601549232, 17.6080481383), (-92.6597137195, 6.3310685453), (-92.6597137195, 0)],
                knots=[0.1037113909, 0.1037113909, 0.1037113909, 0.1037113909, 0.125, 0.15625, 0.1875, 0.25, 0.28125, 0.3125, 0.34375, 0.375, 0.40625, 0.4375, 0.46875, 0.5, 0.5625, 0.625, 0.6875, 0.75, 0.875, 1, 1, 1, 1], degree=3))
            add(Edge.make_bspline(
                [(-51.6597137195, -86), (-52.9677193364, -86), (-55.5503977755, -85.8387170423), (-59.2759659899, -85.1270052189), (-62.7888511515, -83.9819411512), (-66.0392489927, -82.4657547396), (-69.0049863831, -80.6466412752), (-72.572004607, -77.9115906547), (-75.5901006897, -74.8335900569), (-78.1565788298, -71.5853173338), (-79.8818539083, -69.0912636735), (-81.4300788601, -66.5656635825), (-82.8224759946, -64.0265948028), (-84.0707635663, -61.504363593), (-85.1966863154, -59.0086196482), (-86.2313828039, -56.4887914009), (-87.4933204824, -53.0664581165), (-88.8415132837, -48.6774501047), (-90.109265636, -43.1772674245), (-91.0612739187, -37.384955502), (-91.9719894964, -29.1494372612), (-92.5601549232, -17.6080481383), (-92.6597137195, -6.3310685453), (-92.6597137195, 0)],
                knots=[0, 0, 0, 0, 0.03125, 0.0625, 0.09375, 0.125, 0.15625, 0.1875, 0.25, 0.28125, 0.3125, 0.34375, 0.375, 0.40625, 0.4375, 0.46875, 0.5, 0.5625, 0.625, 0.6875, 0.75, 0.875, 1, 1, 1, 1], degree=3))
            Line((-51.6597137195, -86), (-51.6597137195, -76))
            add(Edge.make_bspline(
                [(-51.6597137195, -76), (-53.1097195977, -76), (-54.4968186185, -75.8559625536), (-55.8199547231, -75.5843198027)],
                knots=[0, 0, 0, 0, 0.0504643362, 0.0504643362, 0.0504643362, 0.0504643362], degree=3))
            add(Edge.make_bspline(
                [(-55.8199547231, -75.5843198027), (-56.1355205763, -75.5195334393), (-58.0672567218, -75.0733675402), (-61.3612502345, -73.7570023616), (-65.2837059846, -71.035227187), (-68.6619012674, -67.6088358251), (-71.5492149944, -63.676466045), (-73.5896506783, -60.135000823), (-75.0264216479, -57.2332962118), (-76.0116188685, -55.0496489597), (-76.912177867, -52.8561250408), (-78.003679448, -49.8955719617), (-79.1717511063, -46.0950193349), (-80.2871106611, -41.2637042949), (-81.1460647488, -36.0501110723), (-81.9906513276, -28.4362571667), (-82.5604048188, -17.3855802508), (-82.6597137195, -6.2783429019), (-82.6597137195, 0)],
                knots=[0.0504643362, 0.0504643362, 0.0504643362, 0.0504643362, 0.0625, 0.125, 0.1875, 0.25, 0.3125, 0.375, 0.40625, 0.4375, 0.46875, 0.5, 0.5625, 0.625, 0.6875, 0.75, 0.875, 1, 1, 1, 1], degree=3))
        make_face()
    extrude(amount=F2_DEPTH, both=True)


solid = Compound([f1.part, f1b.part, f2.part])
